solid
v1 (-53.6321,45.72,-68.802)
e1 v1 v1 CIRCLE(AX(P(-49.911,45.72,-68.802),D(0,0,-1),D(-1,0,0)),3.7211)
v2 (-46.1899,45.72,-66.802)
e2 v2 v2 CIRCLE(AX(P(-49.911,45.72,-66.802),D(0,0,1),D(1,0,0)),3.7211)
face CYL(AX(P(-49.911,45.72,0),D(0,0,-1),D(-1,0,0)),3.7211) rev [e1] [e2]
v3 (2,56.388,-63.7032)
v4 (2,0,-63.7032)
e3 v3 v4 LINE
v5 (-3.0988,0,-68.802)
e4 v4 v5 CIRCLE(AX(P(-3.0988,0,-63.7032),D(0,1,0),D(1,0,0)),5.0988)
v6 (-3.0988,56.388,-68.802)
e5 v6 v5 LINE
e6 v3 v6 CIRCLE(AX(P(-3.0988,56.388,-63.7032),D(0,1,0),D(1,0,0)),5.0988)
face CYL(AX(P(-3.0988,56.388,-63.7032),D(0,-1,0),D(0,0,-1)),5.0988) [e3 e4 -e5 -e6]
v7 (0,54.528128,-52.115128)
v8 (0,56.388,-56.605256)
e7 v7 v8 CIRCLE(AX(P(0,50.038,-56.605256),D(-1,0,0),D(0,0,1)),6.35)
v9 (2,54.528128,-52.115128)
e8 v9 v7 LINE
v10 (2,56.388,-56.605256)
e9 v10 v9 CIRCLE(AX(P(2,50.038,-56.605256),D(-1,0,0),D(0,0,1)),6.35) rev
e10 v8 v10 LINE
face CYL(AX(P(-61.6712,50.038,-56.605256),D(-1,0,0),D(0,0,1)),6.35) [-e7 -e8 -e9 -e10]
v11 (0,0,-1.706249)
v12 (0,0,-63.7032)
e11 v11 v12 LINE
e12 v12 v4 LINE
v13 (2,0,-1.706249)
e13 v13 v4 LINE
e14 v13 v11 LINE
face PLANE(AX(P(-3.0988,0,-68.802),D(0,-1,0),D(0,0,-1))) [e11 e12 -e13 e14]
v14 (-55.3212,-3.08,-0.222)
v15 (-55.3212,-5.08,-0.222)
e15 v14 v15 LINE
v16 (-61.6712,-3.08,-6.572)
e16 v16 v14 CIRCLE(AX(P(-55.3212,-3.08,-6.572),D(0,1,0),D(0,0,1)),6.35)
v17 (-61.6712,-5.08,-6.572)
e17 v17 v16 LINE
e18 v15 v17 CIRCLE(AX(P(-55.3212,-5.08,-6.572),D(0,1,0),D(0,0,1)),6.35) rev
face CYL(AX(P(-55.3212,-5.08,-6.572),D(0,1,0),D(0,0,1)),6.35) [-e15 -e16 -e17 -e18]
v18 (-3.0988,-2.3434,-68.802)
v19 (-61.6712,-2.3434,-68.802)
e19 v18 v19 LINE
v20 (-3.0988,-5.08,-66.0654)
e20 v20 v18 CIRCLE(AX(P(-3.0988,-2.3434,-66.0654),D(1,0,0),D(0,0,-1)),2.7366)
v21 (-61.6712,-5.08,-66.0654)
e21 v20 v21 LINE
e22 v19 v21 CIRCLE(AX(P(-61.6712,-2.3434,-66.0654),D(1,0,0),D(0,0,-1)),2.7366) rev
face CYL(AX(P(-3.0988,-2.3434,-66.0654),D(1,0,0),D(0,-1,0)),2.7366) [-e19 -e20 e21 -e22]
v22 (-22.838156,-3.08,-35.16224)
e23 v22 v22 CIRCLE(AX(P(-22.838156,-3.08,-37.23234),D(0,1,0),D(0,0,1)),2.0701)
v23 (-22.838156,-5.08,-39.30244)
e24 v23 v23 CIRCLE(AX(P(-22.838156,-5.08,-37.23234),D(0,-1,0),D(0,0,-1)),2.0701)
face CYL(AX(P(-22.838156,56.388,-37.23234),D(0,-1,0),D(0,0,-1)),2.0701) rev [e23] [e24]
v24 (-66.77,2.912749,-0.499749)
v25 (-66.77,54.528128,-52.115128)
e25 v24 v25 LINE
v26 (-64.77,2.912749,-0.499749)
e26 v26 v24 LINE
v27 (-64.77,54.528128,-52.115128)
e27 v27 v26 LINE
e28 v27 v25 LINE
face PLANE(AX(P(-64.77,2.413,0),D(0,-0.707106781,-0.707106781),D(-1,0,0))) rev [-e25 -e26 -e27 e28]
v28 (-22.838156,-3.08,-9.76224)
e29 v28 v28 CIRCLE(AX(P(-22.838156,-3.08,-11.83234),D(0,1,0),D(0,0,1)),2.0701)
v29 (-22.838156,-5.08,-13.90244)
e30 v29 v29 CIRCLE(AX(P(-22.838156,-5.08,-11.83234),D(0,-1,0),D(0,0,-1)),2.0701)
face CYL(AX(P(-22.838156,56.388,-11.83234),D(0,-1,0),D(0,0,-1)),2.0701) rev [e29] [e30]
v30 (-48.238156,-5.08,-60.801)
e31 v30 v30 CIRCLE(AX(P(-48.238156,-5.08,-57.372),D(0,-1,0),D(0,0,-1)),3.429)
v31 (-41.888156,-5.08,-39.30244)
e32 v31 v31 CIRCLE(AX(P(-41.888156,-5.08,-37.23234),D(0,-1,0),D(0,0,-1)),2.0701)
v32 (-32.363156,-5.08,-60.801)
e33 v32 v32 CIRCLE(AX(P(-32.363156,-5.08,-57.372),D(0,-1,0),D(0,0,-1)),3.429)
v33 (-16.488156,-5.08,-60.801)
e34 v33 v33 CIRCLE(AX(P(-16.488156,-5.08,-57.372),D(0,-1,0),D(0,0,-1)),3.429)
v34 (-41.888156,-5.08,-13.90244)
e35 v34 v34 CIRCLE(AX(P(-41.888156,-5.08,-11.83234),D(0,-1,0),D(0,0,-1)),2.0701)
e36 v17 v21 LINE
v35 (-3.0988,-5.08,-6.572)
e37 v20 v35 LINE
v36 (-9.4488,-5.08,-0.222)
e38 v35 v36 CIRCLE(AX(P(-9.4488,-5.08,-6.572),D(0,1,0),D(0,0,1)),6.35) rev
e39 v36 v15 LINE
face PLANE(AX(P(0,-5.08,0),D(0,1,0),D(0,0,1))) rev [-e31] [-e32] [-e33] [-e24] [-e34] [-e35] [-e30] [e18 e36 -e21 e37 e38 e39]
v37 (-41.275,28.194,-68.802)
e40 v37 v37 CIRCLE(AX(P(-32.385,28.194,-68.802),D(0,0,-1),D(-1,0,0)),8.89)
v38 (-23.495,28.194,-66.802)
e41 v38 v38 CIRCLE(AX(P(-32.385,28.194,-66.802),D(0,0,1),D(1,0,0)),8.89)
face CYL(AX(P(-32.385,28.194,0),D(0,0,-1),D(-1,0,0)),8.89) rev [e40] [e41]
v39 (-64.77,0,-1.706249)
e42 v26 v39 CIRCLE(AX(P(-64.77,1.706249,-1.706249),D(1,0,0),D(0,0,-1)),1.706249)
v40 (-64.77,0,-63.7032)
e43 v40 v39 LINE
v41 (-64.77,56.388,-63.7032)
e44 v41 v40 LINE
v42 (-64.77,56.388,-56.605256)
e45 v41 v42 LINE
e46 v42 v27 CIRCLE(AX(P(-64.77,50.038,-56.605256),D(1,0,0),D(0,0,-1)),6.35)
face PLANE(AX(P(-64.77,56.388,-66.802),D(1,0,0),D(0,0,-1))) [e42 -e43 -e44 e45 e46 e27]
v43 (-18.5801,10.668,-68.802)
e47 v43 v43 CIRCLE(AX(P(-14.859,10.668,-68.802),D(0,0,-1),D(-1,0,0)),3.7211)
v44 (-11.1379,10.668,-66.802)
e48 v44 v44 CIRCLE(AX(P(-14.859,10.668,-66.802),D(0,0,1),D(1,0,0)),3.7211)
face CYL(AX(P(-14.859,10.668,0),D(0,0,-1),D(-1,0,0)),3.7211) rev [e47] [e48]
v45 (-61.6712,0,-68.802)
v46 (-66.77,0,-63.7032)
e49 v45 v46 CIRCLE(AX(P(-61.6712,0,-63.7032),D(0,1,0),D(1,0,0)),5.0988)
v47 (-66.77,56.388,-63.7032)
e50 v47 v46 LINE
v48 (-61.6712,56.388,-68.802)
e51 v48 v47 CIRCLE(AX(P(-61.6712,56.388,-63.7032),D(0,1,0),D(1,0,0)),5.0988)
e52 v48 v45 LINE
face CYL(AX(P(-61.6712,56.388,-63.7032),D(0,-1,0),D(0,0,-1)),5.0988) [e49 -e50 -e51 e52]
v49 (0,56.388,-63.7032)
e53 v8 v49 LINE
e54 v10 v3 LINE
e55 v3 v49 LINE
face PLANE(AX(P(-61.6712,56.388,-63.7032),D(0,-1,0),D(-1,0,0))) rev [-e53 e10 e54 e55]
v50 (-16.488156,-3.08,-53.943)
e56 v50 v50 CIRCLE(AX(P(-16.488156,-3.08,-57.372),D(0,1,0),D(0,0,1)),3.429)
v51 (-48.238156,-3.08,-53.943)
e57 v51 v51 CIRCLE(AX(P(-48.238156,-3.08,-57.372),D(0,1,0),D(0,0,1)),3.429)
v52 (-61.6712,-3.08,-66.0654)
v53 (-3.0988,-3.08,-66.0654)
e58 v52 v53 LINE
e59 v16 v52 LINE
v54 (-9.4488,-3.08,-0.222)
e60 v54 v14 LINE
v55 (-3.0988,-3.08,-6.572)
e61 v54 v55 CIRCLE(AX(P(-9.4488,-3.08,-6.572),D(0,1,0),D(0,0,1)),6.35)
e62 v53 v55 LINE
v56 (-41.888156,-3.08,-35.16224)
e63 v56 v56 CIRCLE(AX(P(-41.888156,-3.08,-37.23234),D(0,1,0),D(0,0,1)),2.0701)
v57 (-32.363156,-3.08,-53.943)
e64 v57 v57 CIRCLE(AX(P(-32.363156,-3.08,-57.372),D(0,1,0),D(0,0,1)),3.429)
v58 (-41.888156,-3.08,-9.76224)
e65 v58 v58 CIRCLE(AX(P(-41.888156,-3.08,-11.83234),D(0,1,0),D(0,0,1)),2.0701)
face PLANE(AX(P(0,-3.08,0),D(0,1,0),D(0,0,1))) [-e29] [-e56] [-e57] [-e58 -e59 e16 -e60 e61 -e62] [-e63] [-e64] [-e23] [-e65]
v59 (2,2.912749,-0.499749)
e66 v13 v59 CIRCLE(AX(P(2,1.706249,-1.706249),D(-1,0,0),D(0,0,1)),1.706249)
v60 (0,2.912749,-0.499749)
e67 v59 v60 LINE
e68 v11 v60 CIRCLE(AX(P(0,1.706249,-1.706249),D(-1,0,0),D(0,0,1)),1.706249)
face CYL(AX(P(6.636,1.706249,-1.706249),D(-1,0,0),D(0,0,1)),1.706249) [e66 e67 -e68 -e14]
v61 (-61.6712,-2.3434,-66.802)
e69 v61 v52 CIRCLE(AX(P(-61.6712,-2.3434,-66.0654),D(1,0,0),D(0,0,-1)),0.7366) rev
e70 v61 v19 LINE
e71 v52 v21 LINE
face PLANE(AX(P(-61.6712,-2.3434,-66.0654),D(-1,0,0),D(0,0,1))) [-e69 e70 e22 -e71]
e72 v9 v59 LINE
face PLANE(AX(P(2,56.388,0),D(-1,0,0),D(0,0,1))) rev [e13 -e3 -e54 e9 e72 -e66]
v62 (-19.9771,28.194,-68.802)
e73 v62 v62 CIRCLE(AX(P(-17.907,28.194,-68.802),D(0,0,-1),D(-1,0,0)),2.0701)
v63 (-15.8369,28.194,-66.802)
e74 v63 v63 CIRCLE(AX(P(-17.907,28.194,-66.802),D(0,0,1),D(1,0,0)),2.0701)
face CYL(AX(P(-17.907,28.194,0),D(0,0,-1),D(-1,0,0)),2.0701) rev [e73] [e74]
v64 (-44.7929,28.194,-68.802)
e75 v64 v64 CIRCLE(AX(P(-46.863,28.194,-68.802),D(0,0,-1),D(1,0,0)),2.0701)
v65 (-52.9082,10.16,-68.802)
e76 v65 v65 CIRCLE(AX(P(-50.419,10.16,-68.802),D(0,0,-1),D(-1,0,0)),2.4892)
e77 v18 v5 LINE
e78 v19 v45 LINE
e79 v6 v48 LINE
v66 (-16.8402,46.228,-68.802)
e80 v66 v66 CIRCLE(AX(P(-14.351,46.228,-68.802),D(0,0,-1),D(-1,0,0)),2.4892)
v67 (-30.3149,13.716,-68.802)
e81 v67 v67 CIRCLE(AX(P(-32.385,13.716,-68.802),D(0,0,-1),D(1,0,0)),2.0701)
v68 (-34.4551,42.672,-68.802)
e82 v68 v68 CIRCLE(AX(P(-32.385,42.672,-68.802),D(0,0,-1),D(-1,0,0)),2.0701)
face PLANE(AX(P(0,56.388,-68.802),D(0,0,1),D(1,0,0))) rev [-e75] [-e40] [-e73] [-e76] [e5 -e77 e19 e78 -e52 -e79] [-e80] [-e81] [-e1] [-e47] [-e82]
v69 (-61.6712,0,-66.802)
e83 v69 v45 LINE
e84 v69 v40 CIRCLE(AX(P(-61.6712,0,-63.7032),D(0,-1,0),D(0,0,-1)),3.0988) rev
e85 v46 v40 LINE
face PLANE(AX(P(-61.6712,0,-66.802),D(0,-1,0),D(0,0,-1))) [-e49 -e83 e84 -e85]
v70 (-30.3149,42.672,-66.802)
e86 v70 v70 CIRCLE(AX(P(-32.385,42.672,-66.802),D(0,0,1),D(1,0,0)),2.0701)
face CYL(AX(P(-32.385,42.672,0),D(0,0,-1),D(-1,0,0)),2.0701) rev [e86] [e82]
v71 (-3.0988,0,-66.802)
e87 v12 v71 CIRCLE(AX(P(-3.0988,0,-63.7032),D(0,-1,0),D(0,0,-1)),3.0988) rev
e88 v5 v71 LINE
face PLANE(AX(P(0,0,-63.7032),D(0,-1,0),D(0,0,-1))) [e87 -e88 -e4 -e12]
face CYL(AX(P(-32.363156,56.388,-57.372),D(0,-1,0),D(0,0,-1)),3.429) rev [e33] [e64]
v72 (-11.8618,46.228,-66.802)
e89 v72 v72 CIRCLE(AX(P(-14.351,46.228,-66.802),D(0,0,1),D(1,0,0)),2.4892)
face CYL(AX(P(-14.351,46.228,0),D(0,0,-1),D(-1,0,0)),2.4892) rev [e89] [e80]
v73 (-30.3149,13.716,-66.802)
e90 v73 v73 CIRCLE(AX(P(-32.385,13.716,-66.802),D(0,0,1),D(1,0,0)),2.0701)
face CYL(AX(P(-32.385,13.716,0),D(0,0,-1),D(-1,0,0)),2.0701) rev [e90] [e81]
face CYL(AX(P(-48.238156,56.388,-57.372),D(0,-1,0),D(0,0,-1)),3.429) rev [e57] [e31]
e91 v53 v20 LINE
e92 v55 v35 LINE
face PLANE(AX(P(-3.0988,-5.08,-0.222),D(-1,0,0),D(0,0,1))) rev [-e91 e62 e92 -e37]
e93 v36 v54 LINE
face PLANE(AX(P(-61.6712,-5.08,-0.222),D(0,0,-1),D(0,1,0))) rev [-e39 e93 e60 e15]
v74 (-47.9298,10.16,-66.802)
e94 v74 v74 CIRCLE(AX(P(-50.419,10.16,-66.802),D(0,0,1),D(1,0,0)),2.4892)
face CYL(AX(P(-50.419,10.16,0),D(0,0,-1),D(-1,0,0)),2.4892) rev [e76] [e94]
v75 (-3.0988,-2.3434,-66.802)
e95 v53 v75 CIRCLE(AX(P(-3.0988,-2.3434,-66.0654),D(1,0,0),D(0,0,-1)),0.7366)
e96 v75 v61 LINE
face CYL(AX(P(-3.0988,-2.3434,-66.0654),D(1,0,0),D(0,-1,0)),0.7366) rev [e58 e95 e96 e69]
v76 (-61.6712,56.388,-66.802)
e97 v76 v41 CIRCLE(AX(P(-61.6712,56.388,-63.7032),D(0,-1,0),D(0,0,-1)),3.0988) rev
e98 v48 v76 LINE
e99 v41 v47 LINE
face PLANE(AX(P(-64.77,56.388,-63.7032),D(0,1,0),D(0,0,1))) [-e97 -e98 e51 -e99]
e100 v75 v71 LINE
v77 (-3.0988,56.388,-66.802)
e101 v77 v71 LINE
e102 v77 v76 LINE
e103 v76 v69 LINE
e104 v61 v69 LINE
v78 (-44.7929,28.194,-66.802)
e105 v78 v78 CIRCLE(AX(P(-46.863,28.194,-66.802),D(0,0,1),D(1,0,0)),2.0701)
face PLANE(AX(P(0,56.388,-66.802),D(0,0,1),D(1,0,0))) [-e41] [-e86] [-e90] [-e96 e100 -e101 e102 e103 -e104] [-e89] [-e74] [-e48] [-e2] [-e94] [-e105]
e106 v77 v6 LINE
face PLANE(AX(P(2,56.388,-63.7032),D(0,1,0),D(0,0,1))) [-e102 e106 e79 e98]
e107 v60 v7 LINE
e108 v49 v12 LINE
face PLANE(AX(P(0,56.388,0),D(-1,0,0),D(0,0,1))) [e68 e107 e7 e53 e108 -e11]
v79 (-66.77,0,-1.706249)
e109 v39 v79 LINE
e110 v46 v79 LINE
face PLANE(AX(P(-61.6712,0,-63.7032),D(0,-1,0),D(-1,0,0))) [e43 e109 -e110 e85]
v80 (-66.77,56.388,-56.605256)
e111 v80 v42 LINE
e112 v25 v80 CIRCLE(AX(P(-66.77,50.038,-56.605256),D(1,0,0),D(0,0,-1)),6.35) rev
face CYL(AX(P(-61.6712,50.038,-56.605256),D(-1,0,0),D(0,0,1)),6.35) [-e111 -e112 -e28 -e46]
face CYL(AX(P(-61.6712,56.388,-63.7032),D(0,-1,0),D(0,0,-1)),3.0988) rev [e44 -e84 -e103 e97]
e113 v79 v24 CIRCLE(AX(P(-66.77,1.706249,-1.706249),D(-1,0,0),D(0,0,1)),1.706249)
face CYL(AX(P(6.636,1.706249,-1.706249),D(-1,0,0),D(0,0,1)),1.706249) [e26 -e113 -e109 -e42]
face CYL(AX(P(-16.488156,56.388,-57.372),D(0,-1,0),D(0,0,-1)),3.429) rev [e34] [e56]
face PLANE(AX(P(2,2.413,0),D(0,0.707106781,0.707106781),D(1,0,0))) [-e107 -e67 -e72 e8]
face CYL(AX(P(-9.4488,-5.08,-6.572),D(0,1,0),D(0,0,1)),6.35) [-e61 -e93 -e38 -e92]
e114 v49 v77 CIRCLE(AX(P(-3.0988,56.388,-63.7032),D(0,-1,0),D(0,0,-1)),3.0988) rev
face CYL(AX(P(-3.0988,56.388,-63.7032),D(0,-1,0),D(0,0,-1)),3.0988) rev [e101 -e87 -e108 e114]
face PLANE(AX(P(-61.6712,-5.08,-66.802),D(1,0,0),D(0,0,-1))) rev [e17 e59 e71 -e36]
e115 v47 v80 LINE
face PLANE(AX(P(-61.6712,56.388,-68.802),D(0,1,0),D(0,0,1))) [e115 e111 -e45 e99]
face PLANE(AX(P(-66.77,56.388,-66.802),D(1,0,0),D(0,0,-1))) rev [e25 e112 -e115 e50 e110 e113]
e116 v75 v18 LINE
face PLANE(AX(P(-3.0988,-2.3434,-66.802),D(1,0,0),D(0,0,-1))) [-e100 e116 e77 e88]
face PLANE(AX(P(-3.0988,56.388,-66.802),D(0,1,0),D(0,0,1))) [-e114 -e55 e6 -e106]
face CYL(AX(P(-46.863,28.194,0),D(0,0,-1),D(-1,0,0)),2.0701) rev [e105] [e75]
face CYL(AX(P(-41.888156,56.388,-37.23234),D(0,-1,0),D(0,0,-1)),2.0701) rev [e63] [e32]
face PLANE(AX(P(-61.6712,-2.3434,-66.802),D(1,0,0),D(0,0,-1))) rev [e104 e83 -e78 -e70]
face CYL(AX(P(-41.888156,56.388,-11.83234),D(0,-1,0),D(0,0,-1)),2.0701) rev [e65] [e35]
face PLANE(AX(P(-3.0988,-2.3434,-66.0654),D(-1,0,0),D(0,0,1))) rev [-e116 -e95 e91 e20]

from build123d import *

# Parameters (mm, degrees)
BASE_FLANGE1_DEPTH      = 56.388
EDGE_FLANGE2_DEPTH      = 58.5724
BREAK_CORNER3_START     = 1.706248663
BREAK_CORNER3_OUTLINE_W = 2
BREAK_CORNER3_OUTLINE_H = 81
BREAK_CORNER3_DEPTH     = 38.166088515
BREAK_CORNER4_START     = 1.706248663
BREAK_CORNER4_OUTLINE_W = 2
BREAK_CORNER4_OUTLINE_H = 81
BREAK_CORNER4_DEPTH     = 38.166088515
SKETCH21_R              = 8.89
SKETCH21_R_2            = 3.7211
SKETCH21_R_3            = 2.4892
SKETCH21_R_4            = 2.0701
CUT_EXTRUDE1_DEPTH      = 112.227490523
SKETCH22_R              = 3.429
CUT_EXTRUDE2_DEPTH      = 114.887063041
SKETCH23_R              = 2.0701
CUT_EXTRUDE3_DEPTH      = 114.887063041
FILLET1_R               = 6.35
CUT_EXTRUDE4_DEPTH      = 73.406


# Read off the part's stored shape, not the designer's step: Base-Flange1, Break-Corner3, Break-Corner4
# Sheet-metal steps are written as plain solids
with BuildPart() as part:
    # Base-Flange1 outline → Base-Flange1 (new body)
    with BuildSketch(Plane(origin=(0, 0, 0), x_dir=(1, 0, 0), z_dir=(0, 1, 0))):
        with BuildLine():
            Line((-66.77, 63.7032), (-66.77, 0))
            Line((-66.77, 0), (-64.77, 0))
            Line((-64.77, 0), (-64.77, 63.7032))
            ThreePointArc((-64.77, 63.7032), (-63.862382494, 65.894382494), (-61.6712, 66.802))
            Line((-61.6712, 66.802), (-3.0988, 66.802))
            ThreePointArc((-3.0988, 66.802), (-0.907617506, 65.894382494), (0, 63.7032))
            Line((0, 63.7032), (0, 0))
            Line((0, 0), (2, 0))
            Line((2, 0), (2, 63.7032))
            ThreePointArc((2, 63.7032), (0.506596056, 67.308596056), (-3.0988, 68.802))
            Line((-3.0988, 68.802), (-61.6712, 68.802))
            ThreePointArc((-61.6712, 68.802), (-65.276596056, 67.308596056), (-66.77, 63.7032))
        make_face()
    extrude(amount=BASE_FLANGE1_DEPTH)

    # Edge-Flange2 section (across the edge) → Edge-Flange2 (add)
    with BuildSketch(Plane(origin=(-61.6712, -5.08, -66.802), x_dir=(0, 1, 0), z_dir=(1, 0, 0))):
        with BuildLine():
            Line((0, 0.7366), (0, 66.58))
            Line((0, 66.58), (2, 66.58))
            Line((2, 66.58), (2, 0.7366))
            ThreePointArc((2, 0.7366), (2.215745145, 0.215745145), (2.7366, 0))
            Line((2.7366, 0), (5.08, 0))
            Line((5.08, 0), (5.08, -2))
            Line((5.08, -2), (2.7366, -2))
            ThreePointArc((2.7366, -2), (0.801531583, -1.198468417), (0, 0.7366))
        make_face()
    extrude(amount=EDGE_FLANGE2_DEPTH)

    # Break-Corner3 outline → Break-Corner3 (cut)
    with BuildSketch(Plane(origin=(0, 0, 0), x_dir=(1, 0, 0), z_dir=(0, 0.7071067811865476, 0.7071067811865476)).offset(BREAK_CORNER3_START)):
        with Locations((-65.77, 39.5)):
            Rectangle(BREAK_CORNER3_OUTLINE_W, BREAK_CORNER3_OUTLINE_H)
    extrude(amount=BREAK_CORNER3_DEPTH, mode=Mode.SUBTRACT)

    # Break-Corner4 outline → Break-Corner4 (cut)
    with BuildSketch(Plane(origin=(0, 0, 0), x_dir=(1, 0, 0), z_dir=(0, 0.7071067811865476, 0.7071067811865476)).offset(BREAK_CORNER4_START)):
        with Locations((1, 39.5)):
            Rectangle(BREAK_CORNER4_OUTLINE_W, BREAK_CORNER4_OUTLINE_H)
    extrude(amount=BREAK_CORNER4_DEPTH, mode=Mode.SUBTRACT)

    # Sketch21 → Cut-Extrude1 (cut, through all)
    with BuildSketch(Plane(origin=(0, 0, -68.802), x_dir=(-1, 0, 0), z_dir=(0, 0, -1))):
        with Locations((32.385, 28.194)):
            Circle(SKETCH21_R)
        with Locations((49.911, 45.72)):
            Circle(SKETCH21_R_2)
        with Locations((14.859, 10.668)):
            Circle(SKETCH21_R_2)
        with Locations((14.351, 46.228)):
            Circle(SKETCH21_R_3)
        with Locations((50.419, 10.16)):
            Circle(SKETCH21_R_3)
        with Locations((32.385, 42.672)):
            Circle(SKETCH21_R_4)
        with Locations((17.907, 28.194)):
            Circle(SKETCH21_R_4)
        with Locations(Location((32.385, 13.716, 0), (0, 0, 180))):
            Circle(SKETCH21_R_4)
        with Locations(Location((46.863, 28.194, 0), (0, 0, 180))):
            Circle(SKETCH21_R_4)
    extrude(amount=-CUT_EXTRUDE1_DEPTH, mode=Mode.SUBTRACT)

    # Sketch22 → Cut-Extrude2 (cut, through all)
    with BuildSketch(Plane.XZ.offset(5.08)):
        with Locations(Location((-48.238156, -57.372, 0), (0, 0, 270))):
            Circle(SKETCH22_R)
        with Locations(Location((-16.488156, -57.372, 0), (0, 0, 270))):
            Circle(SKETCH22_R)
        with Locations(Location((-32.363156, -57.372, 0), (0, 0, 270))):
            Circle(SKETCH22_R)
    extrude(amount=-CUT_EXTRUDE2_DEPTH, mode=Mode.SUBTRACT)

    # Sketch23 → Cut-Extrude3 (cut, through all)
    with BuildSketch(Plane.XZ.offset(5.08)):
        with Locations(Location((-41.888156, -37.23234, 0), (0, 0, 270))):
            Circle(SKETCH23_R)
        with Locations(Location((-41.888156, -11.83234, 0), (0, 0, 270))):
            Circle(SKETCH23_R)
        with Locations(Location((-22.838156, -37.23234, 0), (0, 0, 270))):
            Circle(SKETCH23_R)
        with Locations(Location((-22.838156, -11.83234, 0), (0, 0, 270))):
            Circle(SKETCH23_R)
    extrude(amount=-CUT_EXTRUDE3_DEPTH, mode=Mode.SUBTRACT)

    # Fillet1
    fillet1_edges = [part.edges().sort_by_distance(p)[0] for p in [
        (-61.6712, -4.08, -0.222),
        (-3.0988, -4.08, -0.222),
        (-65.77, 56.388, -53.975),
        (1, 56.388, -53.975),
    ]]
    fillet(fillet1_edges, radius=FILLET1_R)

    # Sketch24 → Cut-Extrude4 (cut)
    with BuildSketch(Plane.ZY.offset(66.77)):
        with BuildLine():
            Line((-0.499748663, 2.912748663), (0, 2.413))
            Line((0, 2.413), (1.847190311, 1.053295568))
            Line((1.847190311, 1.053295568), (0, 0))
            Line((0, 0), (-1.706248663, 0))
            ThreePointArc((-1.706248663, 0), (-0.129880446, 1.053295568), (-0.499748663, 2.912748663))
        make_face()
    extrude(amount=-CUT_EXTRUDE4_DEPTH, mode=Mode.SUBTRACT)


solid = part.part
